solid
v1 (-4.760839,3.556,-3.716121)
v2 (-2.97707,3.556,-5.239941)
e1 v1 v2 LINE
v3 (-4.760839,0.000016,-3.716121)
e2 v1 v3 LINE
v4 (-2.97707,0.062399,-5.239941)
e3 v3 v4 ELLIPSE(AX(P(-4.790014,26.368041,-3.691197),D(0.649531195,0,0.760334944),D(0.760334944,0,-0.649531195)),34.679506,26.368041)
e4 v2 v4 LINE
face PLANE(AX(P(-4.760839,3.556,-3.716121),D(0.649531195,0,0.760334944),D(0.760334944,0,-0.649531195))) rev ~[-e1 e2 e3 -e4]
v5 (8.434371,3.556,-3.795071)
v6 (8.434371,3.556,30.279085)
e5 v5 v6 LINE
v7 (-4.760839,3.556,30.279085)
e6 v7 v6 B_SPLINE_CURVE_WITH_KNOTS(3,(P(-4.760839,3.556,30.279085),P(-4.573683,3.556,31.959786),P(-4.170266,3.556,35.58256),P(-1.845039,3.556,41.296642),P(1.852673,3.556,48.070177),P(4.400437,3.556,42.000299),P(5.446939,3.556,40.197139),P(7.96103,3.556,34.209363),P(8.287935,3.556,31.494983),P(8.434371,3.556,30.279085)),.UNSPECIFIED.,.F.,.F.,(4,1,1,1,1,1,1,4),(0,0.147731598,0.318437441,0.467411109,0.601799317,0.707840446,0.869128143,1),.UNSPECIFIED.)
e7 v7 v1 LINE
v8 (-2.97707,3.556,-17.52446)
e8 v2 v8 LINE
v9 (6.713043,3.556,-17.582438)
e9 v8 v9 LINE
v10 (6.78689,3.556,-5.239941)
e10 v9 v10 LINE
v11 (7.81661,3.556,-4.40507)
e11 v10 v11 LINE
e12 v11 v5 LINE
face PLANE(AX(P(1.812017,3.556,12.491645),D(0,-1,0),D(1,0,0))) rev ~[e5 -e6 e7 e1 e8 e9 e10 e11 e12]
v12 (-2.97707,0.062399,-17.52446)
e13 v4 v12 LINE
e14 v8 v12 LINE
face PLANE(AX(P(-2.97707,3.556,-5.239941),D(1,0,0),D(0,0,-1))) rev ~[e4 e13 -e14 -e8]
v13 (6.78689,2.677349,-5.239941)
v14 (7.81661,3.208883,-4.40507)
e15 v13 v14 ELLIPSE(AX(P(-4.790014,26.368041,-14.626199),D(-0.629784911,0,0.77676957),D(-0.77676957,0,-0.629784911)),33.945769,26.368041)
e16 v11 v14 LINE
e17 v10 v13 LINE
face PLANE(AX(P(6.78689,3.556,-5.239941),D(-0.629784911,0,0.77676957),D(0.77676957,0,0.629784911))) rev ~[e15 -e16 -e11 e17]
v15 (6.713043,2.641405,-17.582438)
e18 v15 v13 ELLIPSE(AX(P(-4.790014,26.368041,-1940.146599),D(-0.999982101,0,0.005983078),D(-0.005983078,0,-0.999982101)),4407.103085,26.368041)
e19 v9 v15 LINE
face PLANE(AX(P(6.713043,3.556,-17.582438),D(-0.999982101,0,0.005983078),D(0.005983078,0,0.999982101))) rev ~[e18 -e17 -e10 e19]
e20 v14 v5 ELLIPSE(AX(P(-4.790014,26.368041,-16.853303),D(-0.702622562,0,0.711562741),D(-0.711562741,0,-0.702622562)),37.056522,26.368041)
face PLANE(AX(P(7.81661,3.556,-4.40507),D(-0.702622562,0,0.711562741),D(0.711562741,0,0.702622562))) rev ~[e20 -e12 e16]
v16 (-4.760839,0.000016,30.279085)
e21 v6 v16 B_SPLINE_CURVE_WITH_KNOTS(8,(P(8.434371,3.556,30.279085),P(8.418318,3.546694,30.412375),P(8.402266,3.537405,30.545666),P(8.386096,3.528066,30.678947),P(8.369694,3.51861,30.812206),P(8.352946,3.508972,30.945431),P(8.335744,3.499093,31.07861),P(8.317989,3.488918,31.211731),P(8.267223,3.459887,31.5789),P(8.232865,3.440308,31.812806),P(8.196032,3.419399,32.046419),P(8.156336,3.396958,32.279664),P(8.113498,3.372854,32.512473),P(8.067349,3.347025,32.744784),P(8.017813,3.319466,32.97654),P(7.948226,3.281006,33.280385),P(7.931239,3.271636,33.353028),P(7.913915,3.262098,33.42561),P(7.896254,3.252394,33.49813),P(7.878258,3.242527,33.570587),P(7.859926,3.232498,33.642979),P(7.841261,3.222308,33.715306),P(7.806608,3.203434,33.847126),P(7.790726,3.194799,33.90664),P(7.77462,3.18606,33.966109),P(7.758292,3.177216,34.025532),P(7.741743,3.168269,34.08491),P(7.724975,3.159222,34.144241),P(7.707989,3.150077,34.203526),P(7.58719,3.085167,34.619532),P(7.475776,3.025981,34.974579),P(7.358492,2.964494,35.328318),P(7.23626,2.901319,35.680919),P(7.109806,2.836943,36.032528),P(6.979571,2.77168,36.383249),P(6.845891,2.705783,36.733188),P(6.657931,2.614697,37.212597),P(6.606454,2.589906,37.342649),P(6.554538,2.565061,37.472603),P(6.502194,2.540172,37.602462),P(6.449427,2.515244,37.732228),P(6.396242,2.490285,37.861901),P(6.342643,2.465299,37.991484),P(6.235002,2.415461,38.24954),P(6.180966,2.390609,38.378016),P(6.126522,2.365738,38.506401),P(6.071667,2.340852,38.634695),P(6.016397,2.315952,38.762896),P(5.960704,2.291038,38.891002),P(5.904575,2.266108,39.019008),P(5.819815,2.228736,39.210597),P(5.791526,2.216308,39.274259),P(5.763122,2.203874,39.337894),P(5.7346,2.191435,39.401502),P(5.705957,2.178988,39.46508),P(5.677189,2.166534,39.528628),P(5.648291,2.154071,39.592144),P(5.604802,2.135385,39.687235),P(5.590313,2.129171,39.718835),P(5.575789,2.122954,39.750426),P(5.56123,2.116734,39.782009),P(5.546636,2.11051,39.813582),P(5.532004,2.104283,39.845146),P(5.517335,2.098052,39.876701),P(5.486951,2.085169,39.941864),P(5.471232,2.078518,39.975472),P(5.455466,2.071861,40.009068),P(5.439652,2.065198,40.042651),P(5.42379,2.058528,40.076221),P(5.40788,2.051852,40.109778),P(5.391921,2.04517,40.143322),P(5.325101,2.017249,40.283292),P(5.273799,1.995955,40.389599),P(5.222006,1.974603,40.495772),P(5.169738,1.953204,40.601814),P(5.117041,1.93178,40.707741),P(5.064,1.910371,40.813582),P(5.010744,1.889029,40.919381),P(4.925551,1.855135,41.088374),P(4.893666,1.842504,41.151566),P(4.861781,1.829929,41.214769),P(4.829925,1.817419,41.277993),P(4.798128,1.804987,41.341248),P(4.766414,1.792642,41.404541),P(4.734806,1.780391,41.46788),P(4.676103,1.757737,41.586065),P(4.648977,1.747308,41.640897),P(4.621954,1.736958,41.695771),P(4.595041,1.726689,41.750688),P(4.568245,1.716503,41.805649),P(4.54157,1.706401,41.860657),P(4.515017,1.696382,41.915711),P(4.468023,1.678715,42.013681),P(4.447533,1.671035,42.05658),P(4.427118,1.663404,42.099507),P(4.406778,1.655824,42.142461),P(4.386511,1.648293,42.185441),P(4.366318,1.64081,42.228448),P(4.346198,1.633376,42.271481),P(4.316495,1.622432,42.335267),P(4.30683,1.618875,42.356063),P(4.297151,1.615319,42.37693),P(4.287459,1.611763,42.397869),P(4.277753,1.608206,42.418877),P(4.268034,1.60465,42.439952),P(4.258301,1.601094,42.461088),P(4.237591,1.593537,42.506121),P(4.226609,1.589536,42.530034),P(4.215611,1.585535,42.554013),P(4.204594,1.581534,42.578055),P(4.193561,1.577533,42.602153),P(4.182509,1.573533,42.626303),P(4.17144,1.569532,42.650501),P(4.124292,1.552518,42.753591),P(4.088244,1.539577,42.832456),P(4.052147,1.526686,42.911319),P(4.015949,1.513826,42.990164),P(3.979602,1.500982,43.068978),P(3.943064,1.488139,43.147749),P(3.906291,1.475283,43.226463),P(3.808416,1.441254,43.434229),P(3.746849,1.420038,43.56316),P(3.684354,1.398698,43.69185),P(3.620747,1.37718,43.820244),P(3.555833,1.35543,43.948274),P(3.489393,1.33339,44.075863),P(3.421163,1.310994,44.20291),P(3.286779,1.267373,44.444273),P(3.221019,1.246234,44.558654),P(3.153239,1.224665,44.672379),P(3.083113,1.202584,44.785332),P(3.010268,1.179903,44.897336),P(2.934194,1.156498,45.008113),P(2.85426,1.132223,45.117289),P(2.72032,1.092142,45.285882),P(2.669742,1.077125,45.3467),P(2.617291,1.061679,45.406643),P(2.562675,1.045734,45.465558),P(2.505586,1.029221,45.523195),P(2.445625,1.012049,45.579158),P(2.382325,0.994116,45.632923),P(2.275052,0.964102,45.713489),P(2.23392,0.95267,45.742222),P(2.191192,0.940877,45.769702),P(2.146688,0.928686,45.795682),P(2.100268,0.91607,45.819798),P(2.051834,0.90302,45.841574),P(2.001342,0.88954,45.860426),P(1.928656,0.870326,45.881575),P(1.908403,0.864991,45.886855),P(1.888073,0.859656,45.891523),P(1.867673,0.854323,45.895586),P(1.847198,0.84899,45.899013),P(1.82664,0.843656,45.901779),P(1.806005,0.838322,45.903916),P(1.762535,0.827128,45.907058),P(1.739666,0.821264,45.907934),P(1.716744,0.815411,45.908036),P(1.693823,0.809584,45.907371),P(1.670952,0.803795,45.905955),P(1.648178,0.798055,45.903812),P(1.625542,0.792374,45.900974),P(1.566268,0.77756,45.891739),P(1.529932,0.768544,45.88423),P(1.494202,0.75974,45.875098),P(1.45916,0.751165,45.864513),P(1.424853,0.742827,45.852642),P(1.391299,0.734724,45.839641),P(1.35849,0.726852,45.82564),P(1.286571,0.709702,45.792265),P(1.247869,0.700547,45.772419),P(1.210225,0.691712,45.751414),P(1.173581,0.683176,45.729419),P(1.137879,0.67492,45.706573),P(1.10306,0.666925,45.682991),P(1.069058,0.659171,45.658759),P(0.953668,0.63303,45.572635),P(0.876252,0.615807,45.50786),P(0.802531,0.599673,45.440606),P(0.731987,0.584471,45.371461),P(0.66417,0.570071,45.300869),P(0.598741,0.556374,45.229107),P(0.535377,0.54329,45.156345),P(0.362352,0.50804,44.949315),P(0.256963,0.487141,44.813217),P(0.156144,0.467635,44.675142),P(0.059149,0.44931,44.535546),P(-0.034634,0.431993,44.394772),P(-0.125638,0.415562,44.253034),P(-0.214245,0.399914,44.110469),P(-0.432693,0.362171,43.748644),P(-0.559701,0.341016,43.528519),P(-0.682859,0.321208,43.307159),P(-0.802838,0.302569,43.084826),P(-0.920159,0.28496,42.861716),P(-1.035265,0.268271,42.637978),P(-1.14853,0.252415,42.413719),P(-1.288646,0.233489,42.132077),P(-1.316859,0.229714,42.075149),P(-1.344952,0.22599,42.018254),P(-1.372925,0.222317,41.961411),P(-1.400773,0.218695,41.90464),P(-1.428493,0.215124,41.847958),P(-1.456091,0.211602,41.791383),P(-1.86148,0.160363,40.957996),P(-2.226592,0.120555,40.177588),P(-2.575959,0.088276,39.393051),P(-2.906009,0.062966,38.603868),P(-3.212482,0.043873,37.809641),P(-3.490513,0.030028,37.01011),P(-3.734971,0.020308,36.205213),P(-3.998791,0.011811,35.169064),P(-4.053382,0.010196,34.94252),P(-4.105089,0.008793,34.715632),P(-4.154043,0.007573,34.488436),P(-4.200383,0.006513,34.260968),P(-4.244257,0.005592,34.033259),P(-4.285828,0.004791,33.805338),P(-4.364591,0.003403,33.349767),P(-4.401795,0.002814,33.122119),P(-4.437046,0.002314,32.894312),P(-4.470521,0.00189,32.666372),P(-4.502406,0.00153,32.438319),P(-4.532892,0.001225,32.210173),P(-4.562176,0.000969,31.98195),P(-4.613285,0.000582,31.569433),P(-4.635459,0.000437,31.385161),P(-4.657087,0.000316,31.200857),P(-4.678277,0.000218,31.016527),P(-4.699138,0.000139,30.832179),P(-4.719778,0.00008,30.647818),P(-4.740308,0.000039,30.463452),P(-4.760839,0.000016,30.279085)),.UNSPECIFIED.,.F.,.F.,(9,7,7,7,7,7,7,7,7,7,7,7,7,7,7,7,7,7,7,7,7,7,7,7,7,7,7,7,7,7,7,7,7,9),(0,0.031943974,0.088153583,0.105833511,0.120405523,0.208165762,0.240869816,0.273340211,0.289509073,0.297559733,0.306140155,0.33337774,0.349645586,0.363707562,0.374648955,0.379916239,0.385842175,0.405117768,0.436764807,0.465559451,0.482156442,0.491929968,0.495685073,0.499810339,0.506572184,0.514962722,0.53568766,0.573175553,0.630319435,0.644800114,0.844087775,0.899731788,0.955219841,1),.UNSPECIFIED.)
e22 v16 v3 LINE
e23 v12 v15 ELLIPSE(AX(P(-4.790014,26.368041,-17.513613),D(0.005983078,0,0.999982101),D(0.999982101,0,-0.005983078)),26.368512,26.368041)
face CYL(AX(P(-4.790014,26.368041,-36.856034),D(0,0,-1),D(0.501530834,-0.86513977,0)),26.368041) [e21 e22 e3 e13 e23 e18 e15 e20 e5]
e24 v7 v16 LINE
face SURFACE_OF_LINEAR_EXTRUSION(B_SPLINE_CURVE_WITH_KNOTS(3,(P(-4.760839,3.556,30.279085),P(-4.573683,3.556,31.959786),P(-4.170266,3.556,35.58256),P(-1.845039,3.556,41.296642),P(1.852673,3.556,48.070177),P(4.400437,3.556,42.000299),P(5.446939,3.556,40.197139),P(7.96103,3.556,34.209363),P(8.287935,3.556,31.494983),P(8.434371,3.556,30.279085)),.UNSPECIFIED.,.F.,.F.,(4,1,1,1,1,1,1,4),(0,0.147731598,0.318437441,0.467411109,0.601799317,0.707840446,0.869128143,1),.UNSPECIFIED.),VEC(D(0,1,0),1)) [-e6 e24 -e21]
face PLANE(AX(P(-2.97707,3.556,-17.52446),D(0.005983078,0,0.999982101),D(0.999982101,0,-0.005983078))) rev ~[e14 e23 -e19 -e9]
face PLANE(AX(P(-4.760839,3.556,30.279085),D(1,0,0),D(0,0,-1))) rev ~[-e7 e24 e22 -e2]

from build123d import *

# Parameters (mm, degrees)
F2_DEPTH    = 3.556
F3_T1_DEPTH = 100.1960824302


# Not quite as in the source:
# - a fillet or chamfer that OpenCascade refuses, or shapes differently, is made with other operations: its cross-section is extruded or revolved along the edge and cut away or added


with BuildPart() as f2:
    # F1 (on offset) → F2 (new body)
    with BuildSketch(Plane.XZ.offset(-3.556)):
        with BuildLine():
            Line((-4.7608385794, 30.2790850401), (-4.7608385794, -3.7161211949))
            Line((-4.7608385794, -3.7161211949), (-2.9770701658, -5.2399407141))
            Line((-2.9770701658, -5.2399407141), (-2.9770701658, -17.5244603306))
            Line((-2.9770701658, -17.5244603306), (6.7130425275, -17.5824380662))
            Line((6.7130425275, -17.5824380662), (6.7868899709, -5.2399407141))
            Line((6.7868899709, -5.2399407141), (7.8166099265, -4.4050700963))
            Line((7.8166099265, -4.4050700963), (8.4343710914, -3.7950705737))
            Line((8.4343710914, -3.7950705737), (8.4343710914, 30.2790850401))
            add(Edge.make_bspline(
                [(-4.7608385794, 30.2790850401), (-4.5736827726, 31.9597863049), (-4.1702659217, 35.5825604162), (-1.8450394854, 41.296641728), (1.8526726795, 48.0701768841), (4.4004372394, 42.0002992607), (5.4469394771, 40.1971389087), (7.9610301665, 34.2093633894), (8.287935143, 31.4949825195), (8.4343710914, 30.2790850401)],
                knots=[0, 0, 0, 0, 0.1477315981, 0.3184374406, 0.4674111086, 0.6017993168, 0.7078404462, 0.869128143, 1, 1, 1, 1], degree=3))
        make_face()
    extrude(amount=F2_DEPTH)

    # F3: fillet of radius 26.3680405282 on 1 edges, made by hand

    # F3_s2 → F3_t1 (cut)
    with BuildSketch(Plane.XY.offset(-36.8560339819)):
        with BuildLine():
            ThreePointArc((8.4343710914, 3.556), (2.057056347, 0.904513961), (-4.7900142719, 0))
            Line((-4.7900142719, 0), (-4.7900142719, -0.5273608106))
            Line((-4.7900142719, -0.5273608106), (8.4343710914, -0.5273608106))
            Line((8.4343710914, -0.5273608106), (8.961731902, 0))
            ThreePointArc((8.961731902, 0), (8.961731902, 1.778), (8.6988587987, 3.0997591894))
            Line((8.6988587987, 3.0997591894), (8.4343710914, 3.556))
        make_face()
    extrude(amount=F3_T1_DEPTH, mode=Mode.SUBTRACT)


solid = f2.part
